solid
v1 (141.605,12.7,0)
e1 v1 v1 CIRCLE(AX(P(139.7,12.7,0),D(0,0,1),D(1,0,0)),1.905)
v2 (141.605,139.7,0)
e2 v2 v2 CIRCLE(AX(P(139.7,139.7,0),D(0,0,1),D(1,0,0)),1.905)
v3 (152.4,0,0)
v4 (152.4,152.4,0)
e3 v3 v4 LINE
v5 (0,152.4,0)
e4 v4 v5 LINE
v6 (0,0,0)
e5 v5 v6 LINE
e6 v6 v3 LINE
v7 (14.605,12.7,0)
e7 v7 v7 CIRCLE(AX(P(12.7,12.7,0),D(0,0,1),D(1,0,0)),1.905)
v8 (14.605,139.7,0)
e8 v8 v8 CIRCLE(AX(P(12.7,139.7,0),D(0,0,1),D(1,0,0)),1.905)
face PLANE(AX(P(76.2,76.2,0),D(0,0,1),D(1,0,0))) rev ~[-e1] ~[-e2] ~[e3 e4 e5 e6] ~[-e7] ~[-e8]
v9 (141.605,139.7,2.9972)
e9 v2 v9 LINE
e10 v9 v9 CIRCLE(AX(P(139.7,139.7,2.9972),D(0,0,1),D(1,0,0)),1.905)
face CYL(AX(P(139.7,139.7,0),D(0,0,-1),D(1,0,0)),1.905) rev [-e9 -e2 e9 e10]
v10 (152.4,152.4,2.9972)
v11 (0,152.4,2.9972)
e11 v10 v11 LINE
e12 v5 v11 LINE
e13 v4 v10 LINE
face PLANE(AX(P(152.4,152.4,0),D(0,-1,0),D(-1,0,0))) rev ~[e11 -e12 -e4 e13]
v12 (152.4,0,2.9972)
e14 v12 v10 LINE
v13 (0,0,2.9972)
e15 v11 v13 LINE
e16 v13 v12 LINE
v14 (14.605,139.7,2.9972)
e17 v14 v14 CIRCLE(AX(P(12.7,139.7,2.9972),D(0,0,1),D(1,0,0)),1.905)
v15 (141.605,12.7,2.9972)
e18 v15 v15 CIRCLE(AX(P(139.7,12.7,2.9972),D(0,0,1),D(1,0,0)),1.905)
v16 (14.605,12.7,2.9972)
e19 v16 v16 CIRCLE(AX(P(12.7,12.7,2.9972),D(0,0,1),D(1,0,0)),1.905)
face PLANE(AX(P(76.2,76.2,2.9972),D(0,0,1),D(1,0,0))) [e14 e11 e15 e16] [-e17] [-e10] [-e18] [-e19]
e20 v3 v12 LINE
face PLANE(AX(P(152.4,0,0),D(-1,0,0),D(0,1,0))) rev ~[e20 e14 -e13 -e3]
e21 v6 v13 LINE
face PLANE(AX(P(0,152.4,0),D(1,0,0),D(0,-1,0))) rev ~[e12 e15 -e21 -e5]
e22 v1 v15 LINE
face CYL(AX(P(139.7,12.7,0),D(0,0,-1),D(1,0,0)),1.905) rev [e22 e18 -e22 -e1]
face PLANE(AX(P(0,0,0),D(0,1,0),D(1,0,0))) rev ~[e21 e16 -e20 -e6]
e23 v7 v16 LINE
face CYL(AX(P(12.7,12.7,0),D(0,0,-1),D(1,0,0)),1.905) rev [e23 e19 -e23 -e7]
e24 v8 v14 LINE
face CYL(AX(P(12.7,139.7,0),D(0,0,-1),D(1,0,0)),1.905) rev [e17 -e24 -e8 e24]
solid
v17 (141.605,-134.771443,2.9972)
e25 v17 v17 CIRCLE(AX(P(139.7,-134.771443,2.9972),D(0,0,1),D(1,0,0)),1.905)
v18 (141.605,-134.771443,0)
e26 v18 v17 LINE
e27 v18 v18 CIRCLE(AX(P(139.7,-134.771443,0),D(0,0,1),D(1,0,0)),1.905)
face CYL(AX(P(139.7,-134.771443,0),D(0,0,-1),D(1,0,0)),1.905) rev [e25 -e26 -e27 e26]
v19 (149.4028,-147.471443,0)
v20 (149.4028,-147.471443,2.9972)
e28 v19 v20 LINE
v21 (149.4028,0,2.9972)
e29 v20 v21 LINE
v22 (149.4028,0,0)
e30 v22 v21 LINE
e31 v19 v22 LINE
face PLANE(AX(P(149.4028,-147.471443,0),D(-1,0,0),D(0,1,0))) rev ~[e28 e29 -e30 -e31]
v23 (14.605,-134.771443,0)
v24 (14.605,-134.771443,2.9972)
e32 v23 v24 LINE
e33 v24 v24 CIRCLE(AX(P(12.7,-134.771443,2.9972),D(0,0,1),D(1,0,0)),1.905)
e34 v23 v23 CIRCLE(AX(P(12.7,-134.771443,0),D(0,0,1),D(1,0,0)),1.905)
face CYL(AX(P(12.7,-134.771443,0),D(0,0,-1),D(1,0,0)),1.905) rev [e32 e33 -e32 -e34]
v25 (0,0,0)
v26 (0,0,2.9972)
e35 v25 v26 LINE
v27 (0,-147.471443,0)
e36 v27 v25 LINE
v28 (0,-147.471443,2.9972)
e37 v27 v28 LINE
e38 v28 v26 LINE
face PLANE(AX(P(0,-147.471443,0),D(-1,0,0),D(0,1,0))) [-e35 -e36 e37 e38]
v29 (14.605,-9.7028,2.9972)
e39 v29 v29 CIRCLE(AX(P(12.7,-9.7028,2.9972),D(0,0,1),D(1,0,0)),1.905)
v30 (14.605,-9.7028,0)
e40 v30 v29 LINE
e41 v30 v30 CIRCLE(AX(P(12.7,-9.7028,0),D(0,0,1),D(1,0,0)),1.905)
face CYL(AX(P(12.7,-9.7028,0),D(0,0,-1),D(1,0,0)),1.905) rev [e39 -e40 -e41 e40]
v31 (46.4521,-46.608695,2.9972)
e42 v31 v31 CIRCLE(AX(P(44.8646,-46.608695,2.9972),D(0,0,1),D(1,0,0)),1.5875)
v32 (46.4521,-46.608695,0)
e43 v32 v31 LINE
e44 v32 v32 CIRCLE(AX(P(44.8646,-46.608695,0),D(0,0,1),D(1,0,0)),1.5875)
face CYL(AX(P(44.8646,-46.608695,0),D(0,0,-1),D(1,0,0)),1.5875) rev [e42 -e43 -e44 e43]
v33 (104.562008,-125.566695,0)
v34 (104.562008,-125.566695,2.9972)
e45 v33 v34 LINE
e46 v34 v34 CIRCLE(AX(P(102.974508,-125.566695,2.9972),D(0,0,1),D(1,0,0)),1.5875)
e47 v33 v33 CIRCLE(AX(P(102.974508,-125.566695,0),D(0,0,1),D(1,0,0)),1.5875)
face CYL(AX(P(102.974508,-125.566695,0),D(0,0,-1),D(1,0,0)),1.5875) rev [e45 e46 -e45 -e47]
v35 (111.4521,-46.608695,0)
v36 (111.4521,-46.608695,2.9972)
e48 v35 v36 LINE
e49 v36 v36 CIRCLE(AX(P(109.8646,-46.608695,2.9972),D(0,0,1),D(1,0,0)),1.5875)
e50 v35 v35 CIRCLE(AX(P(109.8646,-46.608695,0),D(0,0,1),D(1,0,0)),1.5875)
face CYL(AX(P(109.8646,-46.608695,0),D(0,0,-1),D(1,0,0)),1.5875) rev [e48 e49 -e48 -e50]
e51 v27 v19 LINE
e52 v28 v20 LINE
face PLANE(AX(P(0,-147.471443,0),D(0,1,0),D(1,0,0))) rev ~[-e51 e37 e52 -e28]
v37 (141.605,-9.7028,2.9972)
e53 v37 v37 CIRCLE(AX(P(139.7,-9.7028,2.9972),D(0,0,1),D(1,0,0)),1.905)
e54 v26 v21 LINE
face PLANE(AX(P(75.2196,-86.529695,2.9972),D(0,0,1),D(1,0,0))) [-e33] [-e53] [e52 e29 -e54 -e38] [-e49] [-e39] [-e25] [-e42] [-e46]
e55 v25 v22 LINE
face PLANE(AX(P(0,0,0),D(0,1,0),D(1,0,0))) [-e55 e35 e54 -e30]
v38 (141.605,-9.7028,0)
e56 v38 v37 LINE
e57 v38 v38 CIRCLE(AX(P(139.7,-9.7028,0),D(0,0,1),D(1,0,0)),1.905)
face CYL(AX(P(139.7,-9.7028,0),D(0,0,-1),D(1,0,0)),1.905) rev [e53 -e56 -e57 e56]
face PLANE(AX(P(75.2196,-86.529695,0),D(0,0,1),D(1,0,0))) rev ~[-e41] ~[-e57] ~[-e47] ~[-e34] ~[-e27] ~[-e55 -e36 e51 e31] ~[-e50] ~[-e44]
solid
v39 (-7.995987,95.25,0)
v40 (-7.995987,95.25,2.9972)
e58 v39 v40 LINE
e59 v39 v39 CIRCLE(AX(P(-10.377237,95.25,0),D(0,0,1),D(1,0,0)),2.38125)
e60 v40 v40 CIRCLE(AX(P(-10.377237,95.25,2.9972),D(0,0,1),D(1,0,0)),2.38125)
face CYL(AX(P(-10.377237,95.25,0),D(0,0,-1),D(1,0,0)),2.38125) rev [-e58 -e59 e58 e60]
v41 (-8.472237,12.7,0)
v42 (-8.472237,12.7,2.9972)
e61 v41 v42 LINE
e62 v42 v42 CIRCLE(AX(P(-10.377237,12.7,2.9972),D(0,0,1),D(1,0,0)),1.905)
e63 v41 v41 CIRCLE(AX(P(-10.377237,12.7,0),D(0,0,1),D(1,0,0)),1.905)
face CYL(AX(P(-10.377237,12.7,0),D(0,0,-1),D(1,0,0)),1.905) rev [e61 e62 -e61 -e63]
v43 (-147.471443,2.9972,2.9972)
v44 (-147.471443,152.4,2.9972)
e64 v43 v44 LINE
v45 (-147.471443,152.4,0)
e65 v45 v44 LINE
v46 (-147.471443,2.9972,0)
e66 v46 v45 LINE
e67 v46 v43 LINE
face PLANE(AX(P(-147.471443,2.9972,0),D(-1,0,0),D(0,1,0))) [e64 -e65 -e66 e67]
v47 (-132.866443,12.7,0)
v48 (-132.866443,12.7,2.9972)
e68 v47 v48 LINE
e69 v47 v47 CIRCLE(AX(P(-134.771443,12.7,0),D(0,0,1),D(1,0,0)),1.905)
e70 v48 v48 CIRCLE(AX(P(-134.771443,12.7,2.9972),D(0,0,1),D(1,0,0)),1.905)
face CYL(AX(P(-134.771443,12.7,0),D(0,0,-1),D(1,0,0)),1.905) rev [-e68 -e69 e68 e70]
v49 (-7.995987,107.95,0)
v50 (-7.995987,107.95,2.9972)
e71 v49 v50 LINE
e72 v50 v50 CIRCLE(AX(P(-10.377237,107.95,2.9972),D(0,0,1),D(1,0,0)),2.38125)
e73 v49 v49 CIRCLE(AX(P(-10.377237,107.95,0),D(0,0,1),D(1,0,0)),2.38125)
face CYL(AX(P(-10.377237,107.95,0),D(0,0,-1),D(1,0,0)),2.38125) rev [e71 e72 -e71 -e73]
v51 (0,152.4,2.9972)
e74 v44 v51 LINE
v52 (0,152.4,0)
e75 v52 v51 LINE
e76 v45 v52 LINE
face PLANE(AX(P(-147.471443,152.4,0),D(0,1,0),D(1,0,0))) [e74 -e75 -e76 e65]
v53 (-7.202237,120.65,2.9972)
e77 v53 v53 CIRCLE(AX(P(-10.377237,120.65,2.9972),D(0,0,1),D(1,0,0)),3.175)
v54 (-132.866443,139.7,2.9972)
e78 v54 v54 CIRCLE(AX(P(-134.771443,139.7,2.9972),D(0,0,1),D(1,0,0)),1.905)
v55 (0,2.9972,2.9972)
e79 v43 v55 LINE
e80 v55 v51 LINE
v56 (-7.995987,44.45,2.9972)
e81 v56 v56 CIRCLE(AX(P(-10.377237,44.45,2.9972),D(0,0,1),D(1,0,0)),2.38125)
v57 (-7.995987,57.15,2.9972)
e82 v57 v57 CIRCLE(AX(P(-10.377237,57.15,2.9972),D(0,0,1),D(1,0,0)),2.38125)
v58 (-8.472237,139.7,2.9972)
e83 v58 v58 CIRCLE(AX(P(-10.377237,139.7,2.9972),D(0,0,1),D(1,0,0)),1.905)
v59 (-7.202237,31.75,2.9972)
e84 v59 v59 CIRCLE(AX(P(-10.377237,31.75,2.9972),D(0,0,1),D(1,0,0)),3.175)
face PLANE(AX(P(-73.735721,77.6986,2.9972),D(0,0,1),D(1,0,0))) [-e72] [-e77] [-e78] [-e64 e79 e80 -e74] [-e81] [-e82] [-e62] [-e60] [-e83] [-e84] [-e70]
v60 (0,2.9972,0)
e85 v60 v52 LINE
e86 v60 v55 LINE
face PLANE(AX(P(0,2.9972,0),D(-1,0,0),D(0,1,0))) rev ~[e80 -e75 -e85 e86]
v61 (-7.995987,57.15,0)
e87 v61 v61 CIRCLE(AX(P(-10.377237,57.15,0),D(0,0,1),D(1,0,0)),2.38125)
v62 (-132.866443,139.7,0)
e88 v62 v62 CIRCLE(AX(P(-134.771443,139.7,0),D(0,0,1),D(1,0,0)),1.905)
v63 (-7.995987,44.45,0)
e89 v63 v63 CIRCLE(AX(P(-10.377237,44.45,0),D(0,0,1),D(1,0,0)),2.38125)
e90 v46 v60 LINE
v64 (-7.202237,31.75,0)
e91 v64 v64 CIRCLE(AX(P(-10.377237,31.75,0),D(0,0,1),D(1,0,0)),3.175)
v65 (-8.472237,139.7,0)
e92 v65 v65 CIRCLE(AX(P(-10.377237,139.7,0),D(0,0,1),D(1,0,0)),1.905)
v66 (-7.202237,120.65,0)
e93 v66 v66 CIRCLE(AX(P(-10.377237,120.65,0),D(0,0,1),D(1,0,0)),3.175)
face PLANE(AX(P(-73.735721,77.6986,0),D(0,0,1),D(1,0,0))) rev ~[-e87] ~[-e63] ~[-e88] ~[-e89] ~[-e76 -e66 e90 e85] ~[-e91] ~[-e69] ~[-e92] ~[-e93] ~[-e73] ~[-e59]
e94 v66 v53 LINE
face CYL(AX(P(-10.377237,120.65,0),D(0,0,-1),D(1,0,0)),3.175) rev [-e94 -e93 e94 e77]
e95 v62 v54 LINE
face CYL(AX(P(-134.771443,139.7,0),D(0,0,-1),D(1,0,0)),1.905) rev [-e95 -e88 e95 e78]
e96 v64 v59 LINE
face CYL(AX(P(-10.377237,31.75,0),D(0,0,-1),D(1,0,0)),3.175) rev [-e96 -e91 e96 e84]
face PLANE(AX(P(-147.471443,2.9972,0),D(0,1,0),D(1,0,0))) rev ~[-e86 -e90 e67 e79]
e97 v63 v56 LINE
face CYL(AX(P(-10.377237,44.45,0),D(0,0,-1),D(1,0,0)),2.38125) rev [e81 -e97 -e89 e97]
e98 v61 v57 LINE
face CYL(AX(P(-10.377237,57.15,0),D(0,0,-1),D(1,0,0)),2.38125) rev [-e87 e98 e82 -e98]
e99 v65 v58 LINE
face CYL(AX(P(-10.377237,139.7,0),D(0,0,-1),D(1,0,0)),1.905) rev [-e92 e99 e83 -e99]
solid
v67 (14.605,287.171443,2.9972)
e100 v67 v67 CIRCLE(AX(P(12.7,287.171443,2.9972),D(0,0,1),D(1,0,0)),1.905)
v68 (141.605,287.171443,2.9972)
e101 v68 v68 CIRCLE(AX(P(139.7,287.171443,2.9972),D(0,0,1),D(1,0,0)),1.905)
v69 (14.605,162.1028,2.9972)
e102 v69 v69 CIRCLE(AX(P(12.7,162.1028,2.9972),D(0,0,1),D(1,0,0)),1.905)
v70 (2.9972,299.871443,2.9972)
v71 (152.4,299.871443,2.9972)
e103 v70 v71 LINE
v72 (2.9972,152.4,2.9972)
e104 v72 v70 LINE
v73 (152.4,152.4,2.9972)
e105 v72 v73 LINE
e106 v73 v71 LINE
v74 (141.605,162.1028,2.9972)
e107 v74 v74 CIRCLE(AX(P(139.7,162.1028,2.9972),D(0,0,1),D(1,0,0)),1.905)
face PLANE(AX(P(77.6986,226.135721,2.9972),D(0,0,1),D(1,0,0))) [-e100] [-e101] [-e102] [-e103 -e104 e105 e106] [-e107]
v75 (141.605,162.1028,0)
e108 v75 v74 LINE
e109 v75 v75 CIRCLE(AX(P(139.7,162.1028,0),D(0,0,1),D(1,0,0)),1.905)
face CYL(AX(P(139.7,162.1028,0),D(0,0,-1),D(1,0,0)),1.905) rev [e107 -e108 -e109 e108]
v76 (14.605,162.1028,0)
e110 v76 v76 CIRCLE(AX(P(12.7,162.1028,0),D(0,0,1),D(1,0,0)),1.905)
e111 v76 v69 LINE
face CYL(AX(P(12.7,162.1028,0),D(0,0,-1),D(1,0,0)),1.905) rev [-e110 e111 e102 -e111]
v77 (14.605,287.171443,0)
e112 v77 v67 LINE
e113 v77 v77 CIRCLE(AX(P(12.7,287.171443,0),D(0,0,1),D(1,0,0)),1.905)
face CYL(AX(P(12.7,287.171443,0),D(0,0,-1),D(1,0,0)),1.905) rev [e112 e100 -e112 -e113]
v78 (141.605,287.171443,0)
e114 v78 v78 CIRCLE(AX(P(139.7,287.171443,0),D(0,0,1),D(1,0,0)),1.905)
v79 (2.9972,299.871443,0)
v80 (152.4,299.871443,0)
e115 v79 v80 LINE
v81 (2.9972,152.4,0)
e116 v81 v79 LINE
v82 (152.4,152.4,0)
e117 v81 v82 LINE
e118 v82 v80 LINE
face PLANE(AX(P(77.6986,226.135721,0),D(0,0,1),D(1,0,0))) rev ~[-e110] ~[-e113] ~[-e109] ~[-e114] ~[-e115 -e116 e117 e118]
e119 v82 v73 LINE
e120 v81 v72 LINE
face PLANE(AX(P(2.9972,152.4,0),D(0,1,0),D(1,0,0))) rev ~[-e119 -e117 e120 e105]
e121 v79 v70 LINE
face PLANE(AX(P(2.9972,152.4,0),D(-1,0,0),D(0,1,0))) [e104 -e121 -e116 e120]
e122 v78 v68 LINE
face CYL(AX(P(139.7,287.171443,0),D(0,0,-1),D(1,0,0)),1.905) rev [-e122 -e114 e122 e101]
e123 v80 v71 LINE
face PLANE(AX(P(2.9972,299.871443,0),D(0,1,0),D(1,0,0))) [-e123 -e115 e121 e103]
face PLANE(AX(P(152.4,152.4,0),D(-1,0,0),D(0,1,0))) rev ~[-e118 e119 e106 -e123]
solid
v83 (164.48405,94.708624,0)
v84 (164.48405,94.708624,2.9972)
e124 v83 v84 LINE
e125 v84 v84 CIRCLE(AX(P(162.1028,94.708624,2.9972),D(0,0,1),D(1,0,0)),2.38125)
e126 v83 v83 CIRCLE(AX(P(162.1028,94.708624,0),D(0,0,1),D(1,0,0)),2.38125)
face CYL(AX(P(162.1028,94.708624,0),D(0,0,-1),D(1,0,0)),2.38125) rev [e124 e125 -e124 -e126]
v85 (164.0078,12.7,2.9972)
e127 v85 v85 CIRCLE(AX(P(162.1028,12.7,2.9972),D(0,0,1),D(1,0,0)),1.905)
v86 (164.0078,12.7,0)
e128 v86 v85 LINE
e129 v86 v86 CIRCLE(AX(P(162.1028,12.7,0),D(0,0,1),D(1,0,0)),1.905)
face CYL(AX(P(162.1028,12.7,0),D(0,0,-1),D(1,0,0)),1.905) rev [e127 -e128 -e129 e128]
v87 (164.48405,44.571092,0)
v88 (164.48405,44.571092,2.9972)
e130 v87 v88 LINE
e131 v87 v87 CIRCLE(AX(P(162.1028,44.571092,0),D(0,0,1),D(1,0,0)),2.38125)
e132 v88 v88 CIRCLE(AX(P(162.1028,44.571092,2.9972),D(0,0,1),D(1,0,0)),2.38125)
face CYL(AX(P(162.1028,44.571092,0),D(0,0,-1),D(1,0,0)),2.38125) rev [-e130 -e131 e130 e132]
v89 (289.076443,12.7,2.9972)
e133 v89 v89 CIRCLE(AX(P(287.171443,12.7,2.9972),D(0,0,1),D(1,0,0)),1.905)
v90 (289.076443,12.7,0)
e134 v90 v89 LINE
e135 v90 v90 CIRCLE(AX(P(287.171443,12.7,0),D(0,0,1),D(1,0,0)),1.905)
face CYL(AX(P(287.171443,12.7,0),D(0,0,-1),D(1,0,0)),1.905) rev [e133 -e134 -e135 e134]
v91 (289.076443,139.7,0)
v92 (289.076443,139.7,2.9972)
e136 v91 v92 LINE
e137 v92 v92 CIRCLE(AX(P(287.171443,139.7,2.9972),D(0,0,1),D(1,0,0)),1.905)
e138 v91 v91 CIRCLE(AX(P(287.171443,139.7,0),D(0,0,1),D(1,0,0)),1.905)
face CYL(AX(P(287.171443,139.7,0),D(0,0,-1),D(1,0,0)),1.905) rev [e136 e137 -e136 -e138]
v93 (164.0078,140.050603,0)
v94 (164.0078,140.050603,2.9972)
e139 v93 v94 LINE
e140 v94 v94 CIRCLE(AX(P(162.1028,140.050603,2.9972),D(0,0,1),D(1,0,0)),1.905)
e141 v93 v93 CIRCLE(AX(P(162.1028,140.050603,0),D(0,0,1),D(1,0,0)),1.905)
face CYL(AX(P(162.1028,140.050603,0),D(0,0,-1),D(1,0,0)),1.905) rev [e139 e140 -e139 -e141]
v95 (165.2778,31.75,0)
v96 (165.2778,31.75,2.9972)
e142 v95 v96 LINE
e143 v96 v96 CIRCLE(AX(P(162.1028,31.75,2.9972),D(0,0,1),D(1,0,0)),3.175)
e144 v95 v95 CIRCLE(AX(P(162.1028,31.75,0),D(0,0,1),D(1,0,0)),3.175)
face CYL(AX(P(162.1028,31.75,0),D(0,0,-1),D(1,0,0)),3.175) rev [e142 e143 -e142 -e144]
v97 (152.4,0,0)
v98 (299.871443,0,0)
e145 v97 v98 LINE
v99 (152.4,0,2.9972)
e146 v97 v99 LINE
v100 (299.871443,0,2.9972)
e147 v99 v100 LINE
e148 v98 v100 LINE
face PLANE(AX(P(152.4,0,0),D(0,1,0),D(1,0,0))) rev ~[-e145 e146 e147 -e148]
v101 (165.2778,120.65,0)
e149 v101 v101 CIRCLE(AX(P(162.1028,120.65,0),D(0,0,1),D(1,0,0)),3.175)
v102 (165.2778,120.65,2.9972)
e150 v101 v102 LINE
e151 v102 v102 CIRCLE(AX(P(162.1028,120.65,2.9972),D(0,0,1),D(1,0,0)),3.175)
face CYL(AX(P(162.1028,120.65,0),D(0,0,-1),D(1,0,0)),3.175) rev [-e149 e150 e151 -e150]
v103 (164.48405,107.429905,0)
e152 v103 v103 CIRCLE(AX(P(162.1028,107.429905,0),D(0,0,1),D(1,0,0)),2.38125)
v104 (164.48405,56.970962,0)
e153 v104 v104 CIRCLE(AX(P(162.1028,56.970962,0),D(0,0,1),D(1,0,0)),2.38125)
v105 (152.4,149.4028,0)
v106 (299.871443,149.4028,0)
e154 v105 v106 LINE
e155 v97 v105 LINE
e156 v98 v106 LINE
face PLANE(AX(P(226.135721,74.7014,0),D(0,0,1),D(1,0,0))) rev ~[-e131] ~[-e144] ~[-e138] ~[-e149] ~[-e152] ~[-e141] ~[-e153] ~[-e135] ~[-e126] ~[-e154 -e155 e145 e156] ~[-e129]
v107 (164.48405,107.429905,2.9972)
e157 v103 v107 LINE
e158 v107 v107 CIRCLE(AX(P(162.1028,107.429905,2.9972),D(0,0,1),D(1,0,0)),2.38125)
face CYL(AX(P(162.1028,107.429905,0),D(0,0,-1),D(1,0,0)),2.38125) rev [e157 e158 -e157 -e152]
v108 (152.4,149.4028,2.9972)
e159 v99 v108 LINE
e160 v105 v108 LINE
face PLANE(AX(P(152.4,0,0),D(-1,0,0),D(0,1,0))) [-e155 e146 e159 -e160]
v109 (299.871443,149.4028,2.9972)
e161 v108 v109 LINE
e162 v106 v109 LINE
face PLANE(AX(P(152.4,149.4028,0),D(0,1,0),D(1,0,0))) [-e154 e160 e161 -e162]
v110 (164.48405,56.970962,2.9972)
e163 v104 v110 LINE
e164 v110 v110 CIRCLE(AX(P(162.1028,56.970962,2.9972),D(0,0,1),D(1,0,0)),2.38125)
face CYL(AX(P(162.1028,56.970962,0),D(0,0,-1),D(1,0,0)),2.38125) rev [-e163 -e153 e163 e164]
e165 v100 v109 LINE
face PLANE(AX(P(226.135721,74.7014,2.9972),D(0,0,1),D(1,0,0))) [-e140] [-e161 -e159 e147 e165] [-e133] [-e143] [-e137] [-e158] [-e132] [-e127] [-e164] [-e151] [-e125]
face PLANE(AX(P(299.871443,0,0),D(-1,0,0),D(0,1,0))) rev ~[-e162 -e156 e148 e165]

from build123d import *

# Parameters (mm, degrees)
F0_R     = 1.905
F1_DEPTH = 2.9972
F0_W     = 149.4028
F0_H     = 147.4714428186
F2_DEPTH = 2.9972
F0_W_2   = 147.4714428186
F0_H_2   = 149.4028
F0_R_2   = 3.175
F0_R_3   = 2.38125
F3_DEPTH = 2.9972
F0_W_3   = 84.8
F0_H_3   = 90.25
F4_DEPTH = 2.9972
F5_DEPTH = 2.9972
F0_R_4   = 1.5875
F6_DEPTH = 2.9972


# Not quite as in the source:
# - a feature names something its author has since deleted; it is built from what else it names


with BuildPart() as f1:
    # F0 (on Top) → F1 (new body)
    with BuildSketch(Plane.XY):
        Polygon((0, 2.9972), (0, 0), (149.4028, 0), (152.4, 0), (152.4, 149.4028), (152.4, 152.4), (2.9972, 152.4), (0, 152.4), align=None)
        with Locations((12.7, 12.7)):
            Circle(F0_R, mode=Mode.SUBTRACT)
        with Locations((139.7, 12.7)):
            Circle(F0_R, mode=Mode.SUBTRACT)
        with Locations((12.7, 139.7)):
            Circle(F0_R, mode=Mode.SUBTRACT)
        with Locations((139.7, 139.7)):
            Circle(F0_R, mode=Mode.SUBTRACT)
    extrude(amount=F1_DEPTH)


with BuildPart() as f2:
    # F0 (on Top) → F2 (new body)
    with BuildSketch(Plane.XY):
        with Locations((77.6986, 226.1357214093)):
            Rectangle(F0_W, F0_H)
        with Locations((12.7, 162.1028)):
            Circle(F0_R, mode=Mode.SUBTRACT)
        with Locations((12.7, 287.1714428186)):
            Circle(F0_R, mode=Mode.SUBTRACT)
        with Locations((139.7, 162.1028)):
            Circle(F0_R, mode=Mode.SUBTRACT)
        with Locations((139.7, 287.1714428186)):
            Circle(F0_R, mode=Mode.SUBTRACT)
    extrude(amount=F2_DEPTH)


with BuildPart() as f3:
    # F0 (on Top) → F3 (new body)
    with BuildSketch(Plane.XY):
        with Locations((-73.7357214093, 77.6986)):
            Rectangle(F0_W_2, F0_H_2)
        with Locations((-134.7714428186, 12.7)):
            Circle(F0_R, mode=Mode.SUBTRACT)
        with Locations((-10.3772366419, 12.7)):
            Circle(F0_R, mode=Mode.SUBTRACT)
        with Locations((-10.3772366419, 31.75)):
            Circle(F0_R_2, mode=Mode.SUBTRACT)
        with Locations((-10.3772366419, 44.45)):
            Circle(F0_R_3, mode=Mode.SUBTRACT)
        with Locations((-10.3772366419, 57.15)):
            Circle(F0_R_3, mode=Mode.SUBTRACT)
        with Locations((-134.7714428186, 139.7)):
            Circle(F0_R, mode=Mode.SUBTRACT)
        with Locations((-10.3772366419, 95.25)):
            Circle(F0_R_3, mode=Mode.SUBTRACT)
        with Locations((-10.3772366419, 107.95)):
            Circle(F0_R_3, mode=Mode.SUBTRACT)
        with Locations((-10.3772366419, 120.65)):
            Circle(F0_R_2, mode=Mode.SUBTRACT)
        with Locations((-10.3772366419, 139.7)):
            Circle(F0_R, mode=Mode.SUBTRACT)
    extrude(amount=F3_DEPTH)


with BuildPart() as f4:
    # F0 (on Top) → F4 (new body)
    with BuildSketch(Plane.XY):
        with Locations((74.7014, -73.7357214093)):
            Rectangle(F0_W, F0_H)
        with Locations((12.7, -134.7714428186)):
            Circle(F0_R, mode=Mode.SUBTRACT)
        with Locations((75.2196, -86.5296946764)):
            Rectangle(F0_W_3, F0_H_3, mode=Mode.SUBTRACT)
        with Locations((12.7, -9.7028)):
            Circle(F0_R, mode=Mode.SUBTRACT)
        with Locations((139.7, -134.7714428186)):
            Circle(F0_R, mode=Mode.SUBTRACT)
        with Locations((139.7, -9.7028)):
            Circle(F0_R, mode=Mode.SUBTRACT)
    extrude(amount=F4_DEPTH)

    # F0 (on Top) → F6 (join)
    with BuildSketch(Plane.XY):
        with Locations((75.2196, -86.5296946764)):
            Rectangle(F0_W_3, F0_H_3)
        with Locations((44.8646, -46.6086946764)):
            Circle(F0_R_4, mode=Mode.SUBTRACT)
        with Locations((102.9745078107, -125.5666946764)):
            Circle(F0_R_4, mode=Mode.SUBTRACT)
        with Locations((109.8646, -46.6086946764)):
            Circle(F0_R_4, mode=Mode.SUBTRACT)
    extrude(amount=F6_DEPTH)


with BuildPart() as f5:
    # F0 (on Top) → F5 (new body)
    with BuildSketch(Plane.XY):
        with Locations((226.1357214093, 74.7014)):
            Rectangle(F0_W_2, F0_H_2)
        with Locations((162.1028, 12.7)):
            Circle(F0_R, mode=Mode.SUBTRACT)
        with Locations((162.1028, 31.75)):
            Circle(F0_R_2, mode=Mode.SUBTRACT)
        with Locations((162.1028, 44.5710918487)):
            Circle(F0_R_3, mode=Mode.SUBTRACT)
        with Locations((162.1028, 56.9709617438)):
            Circle(F0_R_3, mode=Mode.SUBTRACT)
        with Locations((287.1714428186, 12.7)):
            Circle(F0_R, mode=Mode.SUBTRACT)
        with Locations((162.1028, 94.7086235553)):
            Circle(F0_R_3, mode=Mode.SUBTRACT)
        with Locations((162.1028, 107.4299048555)):
            Circle(F0_R_3, mode=Mode.SUBTRACT)
        with Locations((162.1028, 120.65)):
            Circle(F0_R_2, mode=Mode.SUBTRACT)
        with Locations((162.1028, 140.0506034862)):
            Circle(F0_R, mode=Mode.SUBTRACT)
        with Locations((287.1714428186, 139.7)):
            Circle(F0_R, mode=Mode.SUBTRACT)
    extrude(amount=F5_DEPTH)


solid = Compound([f1.part, f2.part, f3.part, f4.part, f5.part])
